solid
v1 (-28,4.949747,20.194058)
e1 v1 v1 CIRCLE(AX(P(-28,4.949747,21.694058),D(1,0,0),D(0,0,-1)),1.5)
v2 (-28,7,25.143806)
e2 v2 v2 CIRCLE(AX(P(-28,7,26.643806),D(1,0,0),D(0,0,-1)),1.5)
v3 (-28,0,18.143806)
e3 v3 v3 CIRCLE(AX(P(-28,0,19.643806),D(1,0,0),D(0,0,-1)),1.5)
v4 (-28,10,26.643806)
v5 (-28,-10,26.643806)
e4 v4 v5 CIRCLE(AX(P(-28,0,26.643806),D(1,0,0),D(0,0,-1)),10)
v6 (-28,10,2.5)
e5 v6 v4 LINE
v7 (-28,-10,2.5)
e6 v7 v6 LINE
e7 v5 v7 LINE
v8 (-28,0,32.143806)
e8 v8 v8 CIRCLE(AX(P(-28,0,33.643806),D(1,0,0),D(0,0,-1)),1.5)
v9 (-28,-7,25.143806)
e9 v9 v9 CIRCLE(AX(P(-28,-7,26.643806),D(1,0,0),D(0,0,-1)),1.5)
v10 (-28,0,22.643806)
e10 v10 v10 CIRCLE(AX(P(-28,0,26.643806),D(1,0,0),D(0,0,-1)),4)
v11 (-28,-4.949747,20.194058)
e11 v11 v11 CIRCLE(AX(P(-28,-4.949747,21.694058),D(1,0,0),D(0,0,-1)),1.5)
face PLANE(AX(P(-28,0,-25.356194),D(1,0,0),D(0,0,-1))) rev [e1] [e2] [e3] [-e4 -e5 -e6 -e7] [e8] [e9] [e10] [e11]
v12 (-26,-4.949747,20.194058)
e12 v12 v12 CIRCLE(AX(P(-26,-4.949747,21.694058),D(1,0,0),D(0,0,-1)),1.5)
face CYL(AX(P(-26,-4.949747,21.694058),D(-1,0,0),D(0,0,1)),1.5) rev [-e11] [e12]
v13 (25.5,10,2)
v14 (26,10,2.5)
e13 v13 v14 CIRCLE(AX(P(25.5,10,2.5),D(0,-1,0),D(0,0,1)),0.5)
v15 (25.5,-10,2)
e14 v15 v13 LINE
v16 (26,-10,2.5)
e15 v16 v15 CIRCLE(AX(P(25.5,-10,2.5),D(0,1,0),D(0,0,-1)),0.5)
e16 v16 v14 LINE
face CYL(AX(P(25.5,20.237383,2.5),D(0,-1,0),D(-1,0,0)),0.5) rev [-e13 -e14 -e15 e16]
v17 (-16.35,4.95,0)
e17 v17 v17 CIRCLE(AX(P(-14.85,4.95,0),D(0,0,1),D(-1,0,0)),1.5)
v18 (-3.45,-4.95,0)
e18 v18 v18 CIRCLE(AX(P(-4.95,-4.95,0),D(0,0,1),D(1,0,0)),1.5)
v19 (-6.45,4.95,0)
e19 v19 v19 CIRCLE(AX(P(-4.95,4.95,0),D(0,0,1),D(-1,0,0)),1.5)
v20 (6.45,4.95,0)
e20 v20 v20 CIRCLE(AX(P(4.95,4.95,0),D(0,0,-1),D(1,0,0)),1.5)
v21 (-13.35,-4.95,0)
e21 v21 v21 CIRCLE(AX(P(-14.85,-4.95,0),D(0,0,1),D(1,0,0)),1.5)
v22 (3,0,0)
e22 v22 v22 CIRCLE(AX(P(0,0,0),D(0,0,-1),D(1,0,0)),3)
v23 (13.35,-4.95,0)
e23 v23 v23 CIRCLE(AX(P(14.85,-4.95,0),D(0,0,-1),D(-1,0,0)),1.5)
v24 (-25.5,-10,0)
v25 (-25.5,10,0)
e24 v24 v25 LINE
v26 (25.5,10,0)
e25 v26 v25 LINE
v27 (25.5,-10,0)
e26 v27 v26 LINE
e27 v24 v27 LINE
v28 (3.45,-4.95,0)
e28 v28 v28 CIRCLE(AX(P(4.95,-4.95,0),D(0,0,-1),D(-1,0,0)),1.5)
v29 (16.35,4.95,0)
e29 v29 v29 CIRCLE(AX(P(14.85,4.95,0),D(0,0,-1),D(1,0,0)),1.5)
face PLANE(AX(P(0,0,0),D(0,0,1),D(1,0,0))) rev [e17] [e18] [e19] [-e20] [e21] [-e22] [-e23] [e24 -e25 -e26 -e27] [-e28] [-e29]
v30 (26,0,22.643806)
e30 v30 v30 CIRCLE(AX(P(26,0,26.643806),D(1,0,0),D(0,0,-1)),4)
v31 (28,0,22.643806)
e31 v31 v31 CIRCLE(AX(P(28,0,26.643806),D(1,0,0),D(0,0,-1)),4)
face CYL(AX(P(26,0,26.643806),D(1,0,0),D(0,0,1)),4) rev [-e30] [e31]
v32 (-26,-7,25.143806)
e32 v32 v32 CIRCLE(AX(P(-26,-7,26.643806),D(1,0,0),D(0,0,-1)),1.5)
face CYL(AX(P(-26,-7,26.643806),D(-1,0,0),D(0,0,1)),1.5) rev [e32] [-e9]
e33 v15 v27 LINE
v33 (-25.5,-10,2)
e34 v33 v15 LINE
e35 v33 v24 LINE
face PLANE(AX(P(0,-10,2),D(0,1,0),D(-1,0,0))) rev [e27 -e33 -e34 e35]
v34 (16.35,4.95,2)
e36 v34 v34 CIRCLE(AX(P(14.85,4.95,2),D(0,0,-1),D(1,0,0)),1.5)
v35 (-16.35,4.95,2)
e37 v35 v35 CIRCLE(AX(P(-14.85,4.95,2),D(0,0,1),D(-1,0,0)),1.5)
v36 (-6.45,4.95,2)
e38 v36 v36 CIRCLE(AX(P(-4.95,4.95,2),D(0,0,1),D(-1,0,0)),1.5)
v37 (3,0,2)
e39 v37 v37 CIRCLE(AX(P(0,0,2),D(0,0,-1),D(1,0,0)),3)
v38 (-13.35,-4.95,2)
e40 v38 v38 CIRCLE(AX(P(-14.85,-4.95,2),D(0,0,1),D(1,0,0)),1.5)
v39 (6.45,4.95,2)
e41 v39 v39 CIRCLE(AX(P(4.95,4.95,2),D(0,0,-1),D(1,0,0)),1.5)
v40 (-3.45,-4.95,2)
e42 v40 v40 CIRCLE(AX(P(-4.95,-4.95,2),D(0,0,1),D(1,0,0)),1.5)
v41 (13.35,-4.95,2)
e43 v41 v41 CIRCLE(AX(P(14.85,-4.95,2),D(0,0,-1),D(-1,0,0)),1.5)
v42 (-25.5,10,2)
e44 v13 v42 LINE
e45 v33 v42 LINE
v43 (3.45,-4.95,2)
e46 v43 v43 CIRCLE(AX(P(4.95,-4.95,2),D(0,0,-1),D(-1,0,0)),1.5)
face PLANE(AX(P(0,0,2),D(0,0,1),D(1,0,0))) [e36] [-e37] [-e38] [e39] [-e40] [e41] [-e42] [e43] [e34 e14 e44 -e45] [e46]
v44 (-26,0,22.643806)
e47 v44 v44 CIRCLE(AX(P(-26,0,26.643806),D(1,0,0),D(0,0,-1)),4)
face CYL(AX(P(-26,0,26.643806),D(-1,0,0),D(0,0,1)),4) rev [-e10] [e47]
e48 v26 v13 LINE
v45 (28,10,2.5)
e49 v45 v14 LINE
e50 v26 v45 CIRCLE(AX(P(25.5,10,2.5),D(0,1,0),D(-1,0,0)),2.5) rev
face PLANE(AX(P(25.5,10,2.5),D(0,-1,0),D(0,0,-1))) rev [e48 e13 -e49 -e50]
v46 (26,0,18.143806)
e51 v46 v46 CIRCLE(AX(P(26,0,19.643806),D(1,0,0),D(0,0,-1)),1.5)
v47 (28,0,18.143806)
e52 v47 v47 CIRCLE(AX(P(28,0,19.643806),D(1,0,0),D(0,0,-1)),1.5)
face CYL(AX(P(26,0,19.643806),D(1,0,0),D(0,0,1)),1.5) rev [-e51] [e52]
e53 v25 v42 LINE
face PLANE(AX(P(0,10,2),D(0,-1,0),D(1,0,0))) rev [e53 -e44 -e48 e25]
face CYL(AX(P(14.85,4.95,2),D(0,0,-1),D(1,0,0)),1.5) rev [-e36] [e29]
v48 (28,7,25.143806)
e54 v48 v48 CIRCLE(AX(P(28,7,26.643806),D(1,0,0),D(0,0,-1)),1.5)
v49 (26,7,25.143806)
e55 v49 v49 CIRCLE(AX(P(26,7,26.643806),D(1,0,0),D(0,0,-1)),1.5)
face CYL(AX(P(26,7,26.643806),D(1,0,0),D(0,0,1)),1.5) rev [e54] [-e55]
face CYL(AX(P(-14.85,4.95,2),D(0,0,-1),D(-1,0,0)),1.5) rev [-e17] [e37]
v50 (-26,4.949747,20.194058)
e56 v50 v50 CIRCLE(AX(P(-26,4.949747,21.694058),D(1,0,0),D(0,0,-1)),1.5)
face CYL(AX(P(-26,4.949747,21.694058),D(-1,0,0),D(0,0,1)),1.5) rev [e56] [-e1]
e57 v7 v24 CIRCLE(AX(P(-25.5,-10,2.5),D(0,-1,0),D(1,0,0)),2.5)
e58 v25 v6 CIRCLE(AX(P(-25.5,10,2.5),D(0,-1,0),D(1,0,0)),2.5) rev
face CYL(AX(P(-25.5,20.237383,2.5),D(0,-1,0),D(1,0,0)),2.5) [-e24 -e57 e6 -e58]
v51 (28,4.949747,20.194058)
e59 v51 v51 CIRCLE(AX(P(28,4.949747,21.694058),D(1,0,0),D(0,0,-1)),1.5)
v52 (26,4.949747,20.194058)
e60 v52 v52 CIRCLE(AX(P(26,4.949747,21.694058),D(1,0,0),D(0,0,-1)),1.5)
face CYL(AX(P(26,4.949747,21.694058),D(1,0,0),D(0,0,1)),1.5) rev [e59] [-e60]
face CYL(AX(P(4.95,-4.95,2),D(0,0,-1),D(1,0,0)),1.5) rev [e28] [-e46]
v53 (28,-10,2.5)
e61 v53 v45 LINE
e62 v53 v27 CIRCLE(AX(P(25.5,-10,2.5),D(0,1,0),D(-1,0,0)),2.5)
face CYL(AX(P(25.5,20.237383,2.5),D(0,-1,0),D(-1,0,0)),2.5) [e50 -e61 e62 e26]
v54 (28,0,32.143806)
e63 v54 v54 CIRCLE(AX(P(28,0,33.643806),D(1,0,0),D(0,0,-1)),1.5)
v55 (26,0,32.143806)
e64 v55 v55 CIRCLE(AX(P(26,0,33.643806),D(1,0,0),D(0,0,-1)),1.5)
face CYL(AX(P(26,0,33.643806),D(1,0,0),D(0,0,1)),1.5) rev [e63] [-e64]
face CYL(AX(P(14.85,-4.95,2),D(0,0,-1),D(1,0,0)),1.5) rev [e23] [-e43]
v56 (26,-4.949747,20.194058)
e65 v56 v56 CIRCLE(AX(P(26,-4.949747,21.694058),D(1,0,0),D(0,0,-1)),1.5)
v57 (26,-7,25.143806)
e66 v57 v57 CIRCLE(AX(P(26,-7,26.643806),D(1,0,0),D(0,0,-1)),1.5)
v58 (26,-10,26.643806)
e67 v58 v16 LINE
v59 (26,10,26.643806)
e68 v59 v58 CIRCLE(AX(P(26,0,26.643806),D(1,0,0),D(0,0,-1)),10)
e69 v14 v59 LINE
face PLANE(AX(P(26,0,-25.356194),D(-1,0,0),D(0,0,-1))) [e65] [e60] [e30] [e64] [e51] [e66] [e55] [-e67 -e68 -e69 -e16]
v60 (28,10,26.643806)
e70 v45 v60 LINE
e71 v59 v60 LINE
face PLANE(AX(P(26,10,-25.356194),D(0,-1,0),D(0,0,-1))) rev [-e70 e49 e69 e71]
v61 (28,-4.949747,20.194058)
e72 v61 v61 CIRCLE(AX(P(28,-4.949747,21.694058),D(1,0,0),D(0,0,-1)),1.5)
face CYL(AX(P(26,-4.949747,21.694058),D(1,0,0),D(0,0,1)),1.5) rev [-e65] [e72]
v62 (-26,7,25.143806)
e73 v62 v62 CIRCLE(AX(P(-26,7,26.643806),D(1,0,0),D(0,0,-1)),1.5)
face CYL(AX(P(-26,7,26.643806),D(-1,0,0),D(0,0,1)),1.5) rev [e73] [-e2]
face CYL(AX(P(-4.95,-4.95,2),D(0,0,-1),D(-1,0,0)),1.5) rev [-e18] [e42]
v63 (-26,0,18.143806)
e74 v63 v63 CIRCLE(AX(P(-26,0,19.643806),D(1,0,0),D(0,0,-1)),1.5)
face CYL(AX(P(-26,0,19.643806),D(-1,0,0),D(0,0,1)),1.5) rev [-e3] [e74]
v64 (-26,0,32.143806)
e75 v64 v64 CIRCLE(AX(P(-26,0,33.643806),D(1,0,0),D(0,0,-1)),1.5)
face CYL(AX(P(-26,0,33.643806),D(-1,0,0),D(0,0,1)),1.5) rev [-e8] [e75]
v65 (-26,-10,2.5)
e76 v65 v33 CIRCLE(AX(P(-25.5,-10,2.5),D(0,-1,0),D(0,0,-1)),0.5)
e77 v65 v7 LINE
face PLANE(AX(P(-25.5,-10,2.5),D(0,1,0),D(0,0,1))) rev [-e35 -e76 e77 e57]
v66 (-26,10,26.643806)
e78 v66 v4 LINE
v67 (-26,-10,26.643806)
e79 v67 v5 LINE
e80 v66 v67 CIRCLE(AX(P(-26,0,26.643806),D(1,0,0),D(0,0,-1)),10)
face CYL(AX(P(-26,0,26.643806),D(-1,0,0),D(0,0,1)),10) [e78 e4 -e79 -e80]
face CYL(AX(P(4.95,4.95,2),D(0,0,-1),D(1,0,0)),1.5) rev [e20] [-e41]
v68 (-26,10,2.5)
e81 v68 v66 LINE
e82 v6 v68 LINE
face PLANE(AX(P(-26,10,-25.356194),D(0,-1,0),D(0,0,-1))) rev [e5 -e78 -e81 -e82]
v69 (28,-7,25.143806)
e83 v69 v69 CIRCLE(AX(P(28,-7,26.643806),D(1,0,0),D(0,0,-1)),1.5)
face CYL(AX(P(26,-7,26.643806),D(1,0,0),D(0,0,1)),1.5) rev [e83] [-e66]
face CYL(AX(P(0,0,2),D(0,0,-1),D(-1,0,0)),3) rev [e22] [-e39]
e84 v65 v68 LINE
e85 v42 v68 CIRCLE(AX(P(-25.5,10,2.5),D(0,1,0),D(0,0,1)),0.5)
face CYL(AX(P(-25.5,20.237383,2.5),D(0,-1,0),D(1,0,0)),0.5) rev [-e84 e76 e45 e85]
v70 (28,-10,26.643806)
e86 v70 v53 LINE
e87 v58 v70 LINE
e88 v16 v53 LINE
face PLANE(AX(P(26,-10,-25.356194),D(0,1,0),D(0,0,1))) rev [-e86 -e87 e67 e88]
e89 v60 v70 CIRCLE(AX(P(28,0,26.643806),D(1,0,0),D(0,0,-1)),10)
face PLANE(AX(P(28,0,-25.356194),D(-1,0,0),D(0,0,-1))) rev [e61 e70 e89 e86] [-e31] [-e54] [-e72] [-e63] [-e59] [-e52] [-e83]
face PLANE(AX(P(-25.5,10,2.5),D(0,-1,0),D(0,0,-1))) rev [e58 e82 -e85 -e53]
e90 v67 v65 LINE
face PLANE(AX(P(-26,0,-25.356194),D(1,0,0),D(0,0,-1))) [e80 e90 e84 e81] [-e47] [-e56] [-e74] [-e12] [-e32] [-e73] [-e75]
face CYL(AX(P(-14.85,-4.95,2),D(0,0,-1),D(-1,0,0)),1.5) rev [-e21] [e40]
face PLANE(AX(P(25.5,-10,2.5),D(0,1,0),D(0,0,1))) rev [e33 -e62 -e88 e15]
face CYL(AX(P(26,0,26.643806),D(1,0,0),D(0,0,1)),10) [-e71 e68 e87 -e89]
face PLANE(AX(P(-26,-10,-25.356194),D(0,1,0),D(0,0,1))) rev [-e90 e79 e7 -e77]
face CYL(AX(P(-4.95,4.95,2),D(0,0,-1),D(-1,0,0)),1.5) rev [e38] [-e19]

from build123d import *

# Parameters (mm, degrees)
SKETCH1_R                    = 4
SKETCH1_R_2                  = 1.5
EXTRUDE1_DEPTH               = 2
SKETCHED_START               = -63
SKETCHED_BEND1_OUTLINE_W     = 20
SKETCHED_BEND1_OUTLINE_H     = 2
SKETCHED_BEND1_DEPTH         = 35
SKETCHED_START_2             = -27.76405
SKETCHED_BEND1_2_OUTLINE_R   = 1.5
SKETCHED_BEND1_2_OUTLINE_R_2 = 4
SKETCHED_BEND1_2_DEPTH       = 1.76405
SKETCHED_START_3             = -28
SKETCHED_BEND1_3_OUTLINE_R   = 1.5
SKETCHED_BEND1_3_OUTLINE_R_2 = 4
SKETCHED_BEND1_3_DEPTH       = 2.5
SKETCHED_START_4             = -11
SKETCHED_BEND1_4_DEPTH       = 22


with BuildPart() as part:
    # Sketch1 → Extrude1 (new body)
    with BuildSketch(Plane.XY):
        with BuildLine():
            Line((0, -3), (0, -10))
            Line((0, -10), (-52, -10))
            ThreePointArc((-52, -10), (-62, 0), (-52, 10))
            Line((-52, 10), (0, 10))
            Line((0, 10), (0, 3))
            ThreePointArc((0, 3), (-3, 0), (0, -3))
        make_face()
        with Locations((-52, 0)):
            Circle(SKETCH1_R, mode=Mode.SUBTRACT)
        with Locations((-45, 0)):
            Circle(SKETCH1_R_2, mode=Mode.SUBTRACT)
        with Locations((-47.050252532, -4.949747468)):
            Circle(SKETCH1_R_2, mode=Mode.SUBTRACT)
        with Locations((-52, -7)):
            Circle(SKETCH1_R_2, mode=Mode.SUBTRACT)
        with Locations((-59, 0)):
            Circle(SKETCH1_R_2, mode=Mode.SUBTRACT)
        with Locations((-52, 7)):
            Circle(SKETCH1_R_2, mode=Mode.SUBTRACT)
        with Locations((-47.050252532, 4.949747468)):
            Circle(SKETCH1_R_2, mode=Mode.SUBTRACT)
        with Locations((-4.95, -4.95)):
            Circle(SKETCH1_R_2, mode=Mode.SUBTRACT)
        with Locations((-14.85, -4.95)):
            Circle(SKETCH1_R_2, mode=Mode.SUBTRACT)
        with Locations(Location((-4.95, 4.95, 0), (0, 0, 180))):
            Circle(SKETCH1_R_2, mode=Mode.SUBTRACT)
        with Locations(Location((-14.85, 4.95, 0), (0, 0, 180))):
            Circle(SKETCH1_R_2, mode=Mode.SUBTRACT)
    extrude(amount=EXTRUDE1_DEPTH)

    # Sketched Bend1: read off the stored shape, not the designer's step
    # Sketched Bend1 outline → Sketched Bend1 (cut)
    with BuildSketch(Plane.YZ.offset(SKETCHED_START)):
        with Locations((0, 1)):
            Rectangle(SKETCHED_BEND1_OUTLINE_W, SKETCHED_BEND1_OUTLINE_H)
    extrude(amount=SKETCHED_BEND1_DEPTH, mode=Mode.SUBTRACT)

    # Sketched Bend1 2 outline → Sketched Bend1 2 (add)
    with BuildSketch(Plane.YZ.offset(SKETCHED_START_2)):
        with BuildLine():
            Line((10, 2), (10, 26.64380551))
            ThreePointArc((10, 26.64380551), (0, 36.64380551), (-10, 26.64380551))
            Line((-10, 26.64380551), (-10, 2))
            Line((-10, 2), (10, 2))
        make_face()
        with Locations((-7, 26.64380551)):
            Circle(SKETCHED_BEND1_2_OUTLINE_R, mode=Mode.SUBTRACT)
        with Locations((-4.949747468, 21.694058042)):
            Circle(SKETCHED_BEND1_2_OUTLINE_R, mode=Mode.SUBTRACT)
        with Locations((0, 19.64380551)):
            Circle(SKETCHED_BEND1_2_OUTLINE_R, mode=Mode.SUBTRACT)
        with Locations((4.949747468, 21.694058042)):
            Circle(SKETCHED_BEND1_2_OUTLINE_R, mode=Mode.SUBTRACT)
        with Locations((0, 26.64380551)):
            Circle(SKETCHED_BEND1_2_OUTLINE_R_2, mode=Mode.SUBTRACT)
        with Locations((7, 26.64380551)):
            Circle(SKETCHED_BEND1_2_OUTLINE_R, mode=Mode.SUBTRACT)
        with Locations((0, 33.64380551)):
            Circle(SKETCHED_BEND1_2_OUTLINE_R, mode=Mode.SUBTRACT)
    extrude(amount=SKETCHED_BEND1_2_DEPTH)

    # Sketched Bend1 3 outline → Sketched Bend1 3 (add)
    with BuildSketch(Plane.YZ.offset(SKETCHED_START_3)):
        with BuildLine():
            Line((10, 2), (10, 26.64380551))
            ThreePointArc((10, 26.64380551), (0, 36.64380551), (-10, 26.64380551))
            Line((-10, 26.64380551), (-10, 2))
            Line((-10, 2), (10, 2))
        make_face()
        with Locations((-7, 26.64380551)):
            Circle(SKETCHED_BEND1_3_OUTLINE_R, mode=Mode.SUBTRACT)
        with Locations((-4.949747468, 21.694058042)):
            Circle(SKETCHED_BEND1_3_OUTLINE_R, mode=Mode.SUBTRACT)
        with Locations((0, 19.64380551)):
            Circle(SKETCHED_BEND1_3_OUTLINE_R, mode=Mode.SUBTRACT)
        with Locations((4.949747468, 21.694058042)):
            Circle(SKETCHED_BEND1_3_OUTLINE_R, mode=Mode.SUBTRACT)
        with Locations((0, 26.64380551)):
            Circle(SKETCHED_BEND1_3_OUTLINE_R_2, mode=Mode.SUBTRACT)
        with Locations((7, 26.64380551)):
            Circle(SKETCHED_BEND1_3_OUTLINE_R, mode=Mode.SUBTRACT)
        with Locations((0, 33.64380551)):
            Circle(SKETCHED_BEND1_3_OUTLINE_R, mode=Mode.SUBTRACT)
    extrude(amount=SKETCHED_BEND1_3_DEPTH)

    # Sketched Bend1 4 outline → Sketched Bend1 4 (cut)
    with BuildSketch(Plane(origin=(0, 0, 0), x_dir=(1, 0, 0), z_dir=(0, 1, 0)).offset(SKETCHED_START_4)):
        with BuildLine():
            Line((-26, -2.5), (-26, -38))
            Line((-26, -38), (-25.5, -38))
            Line((-25.5, -38), (-25.5, -2))
            ThreePointArc((-25.5, -2), (-25.853553391, -2.146446609), (-26, -2.5))
        make_face()
        with BuildLine():
            Line((-29, -38), (-27.999999998, -38))
            Line((-27.999999998, -38), (-28, -2.5))
            ThreePointArc((-28, -2.5), (-27.267766953, -0.732233047), (-25.5, 0))
            Line((-25.5, 0), (-24, 0))
            Line((-24, 0), (-24, 1))
            Line((-24, 1), (-29, 1))
            Line((-29, 1), (-29, -38))
        make_face()
    extrude(amount=SKETCHED_BEND1_4_DEPTH, mode=Mode.SUBTRACT)

    # Mirror1: part across plane


with BuildPart() as part_1:
    add(part.part)
    add(part.part.mirror(Plane(origin=(0, -3, 2), x_dir=(0, 0, 1), z_dir=(-1, 0, 0))))


solid = part_1.part
